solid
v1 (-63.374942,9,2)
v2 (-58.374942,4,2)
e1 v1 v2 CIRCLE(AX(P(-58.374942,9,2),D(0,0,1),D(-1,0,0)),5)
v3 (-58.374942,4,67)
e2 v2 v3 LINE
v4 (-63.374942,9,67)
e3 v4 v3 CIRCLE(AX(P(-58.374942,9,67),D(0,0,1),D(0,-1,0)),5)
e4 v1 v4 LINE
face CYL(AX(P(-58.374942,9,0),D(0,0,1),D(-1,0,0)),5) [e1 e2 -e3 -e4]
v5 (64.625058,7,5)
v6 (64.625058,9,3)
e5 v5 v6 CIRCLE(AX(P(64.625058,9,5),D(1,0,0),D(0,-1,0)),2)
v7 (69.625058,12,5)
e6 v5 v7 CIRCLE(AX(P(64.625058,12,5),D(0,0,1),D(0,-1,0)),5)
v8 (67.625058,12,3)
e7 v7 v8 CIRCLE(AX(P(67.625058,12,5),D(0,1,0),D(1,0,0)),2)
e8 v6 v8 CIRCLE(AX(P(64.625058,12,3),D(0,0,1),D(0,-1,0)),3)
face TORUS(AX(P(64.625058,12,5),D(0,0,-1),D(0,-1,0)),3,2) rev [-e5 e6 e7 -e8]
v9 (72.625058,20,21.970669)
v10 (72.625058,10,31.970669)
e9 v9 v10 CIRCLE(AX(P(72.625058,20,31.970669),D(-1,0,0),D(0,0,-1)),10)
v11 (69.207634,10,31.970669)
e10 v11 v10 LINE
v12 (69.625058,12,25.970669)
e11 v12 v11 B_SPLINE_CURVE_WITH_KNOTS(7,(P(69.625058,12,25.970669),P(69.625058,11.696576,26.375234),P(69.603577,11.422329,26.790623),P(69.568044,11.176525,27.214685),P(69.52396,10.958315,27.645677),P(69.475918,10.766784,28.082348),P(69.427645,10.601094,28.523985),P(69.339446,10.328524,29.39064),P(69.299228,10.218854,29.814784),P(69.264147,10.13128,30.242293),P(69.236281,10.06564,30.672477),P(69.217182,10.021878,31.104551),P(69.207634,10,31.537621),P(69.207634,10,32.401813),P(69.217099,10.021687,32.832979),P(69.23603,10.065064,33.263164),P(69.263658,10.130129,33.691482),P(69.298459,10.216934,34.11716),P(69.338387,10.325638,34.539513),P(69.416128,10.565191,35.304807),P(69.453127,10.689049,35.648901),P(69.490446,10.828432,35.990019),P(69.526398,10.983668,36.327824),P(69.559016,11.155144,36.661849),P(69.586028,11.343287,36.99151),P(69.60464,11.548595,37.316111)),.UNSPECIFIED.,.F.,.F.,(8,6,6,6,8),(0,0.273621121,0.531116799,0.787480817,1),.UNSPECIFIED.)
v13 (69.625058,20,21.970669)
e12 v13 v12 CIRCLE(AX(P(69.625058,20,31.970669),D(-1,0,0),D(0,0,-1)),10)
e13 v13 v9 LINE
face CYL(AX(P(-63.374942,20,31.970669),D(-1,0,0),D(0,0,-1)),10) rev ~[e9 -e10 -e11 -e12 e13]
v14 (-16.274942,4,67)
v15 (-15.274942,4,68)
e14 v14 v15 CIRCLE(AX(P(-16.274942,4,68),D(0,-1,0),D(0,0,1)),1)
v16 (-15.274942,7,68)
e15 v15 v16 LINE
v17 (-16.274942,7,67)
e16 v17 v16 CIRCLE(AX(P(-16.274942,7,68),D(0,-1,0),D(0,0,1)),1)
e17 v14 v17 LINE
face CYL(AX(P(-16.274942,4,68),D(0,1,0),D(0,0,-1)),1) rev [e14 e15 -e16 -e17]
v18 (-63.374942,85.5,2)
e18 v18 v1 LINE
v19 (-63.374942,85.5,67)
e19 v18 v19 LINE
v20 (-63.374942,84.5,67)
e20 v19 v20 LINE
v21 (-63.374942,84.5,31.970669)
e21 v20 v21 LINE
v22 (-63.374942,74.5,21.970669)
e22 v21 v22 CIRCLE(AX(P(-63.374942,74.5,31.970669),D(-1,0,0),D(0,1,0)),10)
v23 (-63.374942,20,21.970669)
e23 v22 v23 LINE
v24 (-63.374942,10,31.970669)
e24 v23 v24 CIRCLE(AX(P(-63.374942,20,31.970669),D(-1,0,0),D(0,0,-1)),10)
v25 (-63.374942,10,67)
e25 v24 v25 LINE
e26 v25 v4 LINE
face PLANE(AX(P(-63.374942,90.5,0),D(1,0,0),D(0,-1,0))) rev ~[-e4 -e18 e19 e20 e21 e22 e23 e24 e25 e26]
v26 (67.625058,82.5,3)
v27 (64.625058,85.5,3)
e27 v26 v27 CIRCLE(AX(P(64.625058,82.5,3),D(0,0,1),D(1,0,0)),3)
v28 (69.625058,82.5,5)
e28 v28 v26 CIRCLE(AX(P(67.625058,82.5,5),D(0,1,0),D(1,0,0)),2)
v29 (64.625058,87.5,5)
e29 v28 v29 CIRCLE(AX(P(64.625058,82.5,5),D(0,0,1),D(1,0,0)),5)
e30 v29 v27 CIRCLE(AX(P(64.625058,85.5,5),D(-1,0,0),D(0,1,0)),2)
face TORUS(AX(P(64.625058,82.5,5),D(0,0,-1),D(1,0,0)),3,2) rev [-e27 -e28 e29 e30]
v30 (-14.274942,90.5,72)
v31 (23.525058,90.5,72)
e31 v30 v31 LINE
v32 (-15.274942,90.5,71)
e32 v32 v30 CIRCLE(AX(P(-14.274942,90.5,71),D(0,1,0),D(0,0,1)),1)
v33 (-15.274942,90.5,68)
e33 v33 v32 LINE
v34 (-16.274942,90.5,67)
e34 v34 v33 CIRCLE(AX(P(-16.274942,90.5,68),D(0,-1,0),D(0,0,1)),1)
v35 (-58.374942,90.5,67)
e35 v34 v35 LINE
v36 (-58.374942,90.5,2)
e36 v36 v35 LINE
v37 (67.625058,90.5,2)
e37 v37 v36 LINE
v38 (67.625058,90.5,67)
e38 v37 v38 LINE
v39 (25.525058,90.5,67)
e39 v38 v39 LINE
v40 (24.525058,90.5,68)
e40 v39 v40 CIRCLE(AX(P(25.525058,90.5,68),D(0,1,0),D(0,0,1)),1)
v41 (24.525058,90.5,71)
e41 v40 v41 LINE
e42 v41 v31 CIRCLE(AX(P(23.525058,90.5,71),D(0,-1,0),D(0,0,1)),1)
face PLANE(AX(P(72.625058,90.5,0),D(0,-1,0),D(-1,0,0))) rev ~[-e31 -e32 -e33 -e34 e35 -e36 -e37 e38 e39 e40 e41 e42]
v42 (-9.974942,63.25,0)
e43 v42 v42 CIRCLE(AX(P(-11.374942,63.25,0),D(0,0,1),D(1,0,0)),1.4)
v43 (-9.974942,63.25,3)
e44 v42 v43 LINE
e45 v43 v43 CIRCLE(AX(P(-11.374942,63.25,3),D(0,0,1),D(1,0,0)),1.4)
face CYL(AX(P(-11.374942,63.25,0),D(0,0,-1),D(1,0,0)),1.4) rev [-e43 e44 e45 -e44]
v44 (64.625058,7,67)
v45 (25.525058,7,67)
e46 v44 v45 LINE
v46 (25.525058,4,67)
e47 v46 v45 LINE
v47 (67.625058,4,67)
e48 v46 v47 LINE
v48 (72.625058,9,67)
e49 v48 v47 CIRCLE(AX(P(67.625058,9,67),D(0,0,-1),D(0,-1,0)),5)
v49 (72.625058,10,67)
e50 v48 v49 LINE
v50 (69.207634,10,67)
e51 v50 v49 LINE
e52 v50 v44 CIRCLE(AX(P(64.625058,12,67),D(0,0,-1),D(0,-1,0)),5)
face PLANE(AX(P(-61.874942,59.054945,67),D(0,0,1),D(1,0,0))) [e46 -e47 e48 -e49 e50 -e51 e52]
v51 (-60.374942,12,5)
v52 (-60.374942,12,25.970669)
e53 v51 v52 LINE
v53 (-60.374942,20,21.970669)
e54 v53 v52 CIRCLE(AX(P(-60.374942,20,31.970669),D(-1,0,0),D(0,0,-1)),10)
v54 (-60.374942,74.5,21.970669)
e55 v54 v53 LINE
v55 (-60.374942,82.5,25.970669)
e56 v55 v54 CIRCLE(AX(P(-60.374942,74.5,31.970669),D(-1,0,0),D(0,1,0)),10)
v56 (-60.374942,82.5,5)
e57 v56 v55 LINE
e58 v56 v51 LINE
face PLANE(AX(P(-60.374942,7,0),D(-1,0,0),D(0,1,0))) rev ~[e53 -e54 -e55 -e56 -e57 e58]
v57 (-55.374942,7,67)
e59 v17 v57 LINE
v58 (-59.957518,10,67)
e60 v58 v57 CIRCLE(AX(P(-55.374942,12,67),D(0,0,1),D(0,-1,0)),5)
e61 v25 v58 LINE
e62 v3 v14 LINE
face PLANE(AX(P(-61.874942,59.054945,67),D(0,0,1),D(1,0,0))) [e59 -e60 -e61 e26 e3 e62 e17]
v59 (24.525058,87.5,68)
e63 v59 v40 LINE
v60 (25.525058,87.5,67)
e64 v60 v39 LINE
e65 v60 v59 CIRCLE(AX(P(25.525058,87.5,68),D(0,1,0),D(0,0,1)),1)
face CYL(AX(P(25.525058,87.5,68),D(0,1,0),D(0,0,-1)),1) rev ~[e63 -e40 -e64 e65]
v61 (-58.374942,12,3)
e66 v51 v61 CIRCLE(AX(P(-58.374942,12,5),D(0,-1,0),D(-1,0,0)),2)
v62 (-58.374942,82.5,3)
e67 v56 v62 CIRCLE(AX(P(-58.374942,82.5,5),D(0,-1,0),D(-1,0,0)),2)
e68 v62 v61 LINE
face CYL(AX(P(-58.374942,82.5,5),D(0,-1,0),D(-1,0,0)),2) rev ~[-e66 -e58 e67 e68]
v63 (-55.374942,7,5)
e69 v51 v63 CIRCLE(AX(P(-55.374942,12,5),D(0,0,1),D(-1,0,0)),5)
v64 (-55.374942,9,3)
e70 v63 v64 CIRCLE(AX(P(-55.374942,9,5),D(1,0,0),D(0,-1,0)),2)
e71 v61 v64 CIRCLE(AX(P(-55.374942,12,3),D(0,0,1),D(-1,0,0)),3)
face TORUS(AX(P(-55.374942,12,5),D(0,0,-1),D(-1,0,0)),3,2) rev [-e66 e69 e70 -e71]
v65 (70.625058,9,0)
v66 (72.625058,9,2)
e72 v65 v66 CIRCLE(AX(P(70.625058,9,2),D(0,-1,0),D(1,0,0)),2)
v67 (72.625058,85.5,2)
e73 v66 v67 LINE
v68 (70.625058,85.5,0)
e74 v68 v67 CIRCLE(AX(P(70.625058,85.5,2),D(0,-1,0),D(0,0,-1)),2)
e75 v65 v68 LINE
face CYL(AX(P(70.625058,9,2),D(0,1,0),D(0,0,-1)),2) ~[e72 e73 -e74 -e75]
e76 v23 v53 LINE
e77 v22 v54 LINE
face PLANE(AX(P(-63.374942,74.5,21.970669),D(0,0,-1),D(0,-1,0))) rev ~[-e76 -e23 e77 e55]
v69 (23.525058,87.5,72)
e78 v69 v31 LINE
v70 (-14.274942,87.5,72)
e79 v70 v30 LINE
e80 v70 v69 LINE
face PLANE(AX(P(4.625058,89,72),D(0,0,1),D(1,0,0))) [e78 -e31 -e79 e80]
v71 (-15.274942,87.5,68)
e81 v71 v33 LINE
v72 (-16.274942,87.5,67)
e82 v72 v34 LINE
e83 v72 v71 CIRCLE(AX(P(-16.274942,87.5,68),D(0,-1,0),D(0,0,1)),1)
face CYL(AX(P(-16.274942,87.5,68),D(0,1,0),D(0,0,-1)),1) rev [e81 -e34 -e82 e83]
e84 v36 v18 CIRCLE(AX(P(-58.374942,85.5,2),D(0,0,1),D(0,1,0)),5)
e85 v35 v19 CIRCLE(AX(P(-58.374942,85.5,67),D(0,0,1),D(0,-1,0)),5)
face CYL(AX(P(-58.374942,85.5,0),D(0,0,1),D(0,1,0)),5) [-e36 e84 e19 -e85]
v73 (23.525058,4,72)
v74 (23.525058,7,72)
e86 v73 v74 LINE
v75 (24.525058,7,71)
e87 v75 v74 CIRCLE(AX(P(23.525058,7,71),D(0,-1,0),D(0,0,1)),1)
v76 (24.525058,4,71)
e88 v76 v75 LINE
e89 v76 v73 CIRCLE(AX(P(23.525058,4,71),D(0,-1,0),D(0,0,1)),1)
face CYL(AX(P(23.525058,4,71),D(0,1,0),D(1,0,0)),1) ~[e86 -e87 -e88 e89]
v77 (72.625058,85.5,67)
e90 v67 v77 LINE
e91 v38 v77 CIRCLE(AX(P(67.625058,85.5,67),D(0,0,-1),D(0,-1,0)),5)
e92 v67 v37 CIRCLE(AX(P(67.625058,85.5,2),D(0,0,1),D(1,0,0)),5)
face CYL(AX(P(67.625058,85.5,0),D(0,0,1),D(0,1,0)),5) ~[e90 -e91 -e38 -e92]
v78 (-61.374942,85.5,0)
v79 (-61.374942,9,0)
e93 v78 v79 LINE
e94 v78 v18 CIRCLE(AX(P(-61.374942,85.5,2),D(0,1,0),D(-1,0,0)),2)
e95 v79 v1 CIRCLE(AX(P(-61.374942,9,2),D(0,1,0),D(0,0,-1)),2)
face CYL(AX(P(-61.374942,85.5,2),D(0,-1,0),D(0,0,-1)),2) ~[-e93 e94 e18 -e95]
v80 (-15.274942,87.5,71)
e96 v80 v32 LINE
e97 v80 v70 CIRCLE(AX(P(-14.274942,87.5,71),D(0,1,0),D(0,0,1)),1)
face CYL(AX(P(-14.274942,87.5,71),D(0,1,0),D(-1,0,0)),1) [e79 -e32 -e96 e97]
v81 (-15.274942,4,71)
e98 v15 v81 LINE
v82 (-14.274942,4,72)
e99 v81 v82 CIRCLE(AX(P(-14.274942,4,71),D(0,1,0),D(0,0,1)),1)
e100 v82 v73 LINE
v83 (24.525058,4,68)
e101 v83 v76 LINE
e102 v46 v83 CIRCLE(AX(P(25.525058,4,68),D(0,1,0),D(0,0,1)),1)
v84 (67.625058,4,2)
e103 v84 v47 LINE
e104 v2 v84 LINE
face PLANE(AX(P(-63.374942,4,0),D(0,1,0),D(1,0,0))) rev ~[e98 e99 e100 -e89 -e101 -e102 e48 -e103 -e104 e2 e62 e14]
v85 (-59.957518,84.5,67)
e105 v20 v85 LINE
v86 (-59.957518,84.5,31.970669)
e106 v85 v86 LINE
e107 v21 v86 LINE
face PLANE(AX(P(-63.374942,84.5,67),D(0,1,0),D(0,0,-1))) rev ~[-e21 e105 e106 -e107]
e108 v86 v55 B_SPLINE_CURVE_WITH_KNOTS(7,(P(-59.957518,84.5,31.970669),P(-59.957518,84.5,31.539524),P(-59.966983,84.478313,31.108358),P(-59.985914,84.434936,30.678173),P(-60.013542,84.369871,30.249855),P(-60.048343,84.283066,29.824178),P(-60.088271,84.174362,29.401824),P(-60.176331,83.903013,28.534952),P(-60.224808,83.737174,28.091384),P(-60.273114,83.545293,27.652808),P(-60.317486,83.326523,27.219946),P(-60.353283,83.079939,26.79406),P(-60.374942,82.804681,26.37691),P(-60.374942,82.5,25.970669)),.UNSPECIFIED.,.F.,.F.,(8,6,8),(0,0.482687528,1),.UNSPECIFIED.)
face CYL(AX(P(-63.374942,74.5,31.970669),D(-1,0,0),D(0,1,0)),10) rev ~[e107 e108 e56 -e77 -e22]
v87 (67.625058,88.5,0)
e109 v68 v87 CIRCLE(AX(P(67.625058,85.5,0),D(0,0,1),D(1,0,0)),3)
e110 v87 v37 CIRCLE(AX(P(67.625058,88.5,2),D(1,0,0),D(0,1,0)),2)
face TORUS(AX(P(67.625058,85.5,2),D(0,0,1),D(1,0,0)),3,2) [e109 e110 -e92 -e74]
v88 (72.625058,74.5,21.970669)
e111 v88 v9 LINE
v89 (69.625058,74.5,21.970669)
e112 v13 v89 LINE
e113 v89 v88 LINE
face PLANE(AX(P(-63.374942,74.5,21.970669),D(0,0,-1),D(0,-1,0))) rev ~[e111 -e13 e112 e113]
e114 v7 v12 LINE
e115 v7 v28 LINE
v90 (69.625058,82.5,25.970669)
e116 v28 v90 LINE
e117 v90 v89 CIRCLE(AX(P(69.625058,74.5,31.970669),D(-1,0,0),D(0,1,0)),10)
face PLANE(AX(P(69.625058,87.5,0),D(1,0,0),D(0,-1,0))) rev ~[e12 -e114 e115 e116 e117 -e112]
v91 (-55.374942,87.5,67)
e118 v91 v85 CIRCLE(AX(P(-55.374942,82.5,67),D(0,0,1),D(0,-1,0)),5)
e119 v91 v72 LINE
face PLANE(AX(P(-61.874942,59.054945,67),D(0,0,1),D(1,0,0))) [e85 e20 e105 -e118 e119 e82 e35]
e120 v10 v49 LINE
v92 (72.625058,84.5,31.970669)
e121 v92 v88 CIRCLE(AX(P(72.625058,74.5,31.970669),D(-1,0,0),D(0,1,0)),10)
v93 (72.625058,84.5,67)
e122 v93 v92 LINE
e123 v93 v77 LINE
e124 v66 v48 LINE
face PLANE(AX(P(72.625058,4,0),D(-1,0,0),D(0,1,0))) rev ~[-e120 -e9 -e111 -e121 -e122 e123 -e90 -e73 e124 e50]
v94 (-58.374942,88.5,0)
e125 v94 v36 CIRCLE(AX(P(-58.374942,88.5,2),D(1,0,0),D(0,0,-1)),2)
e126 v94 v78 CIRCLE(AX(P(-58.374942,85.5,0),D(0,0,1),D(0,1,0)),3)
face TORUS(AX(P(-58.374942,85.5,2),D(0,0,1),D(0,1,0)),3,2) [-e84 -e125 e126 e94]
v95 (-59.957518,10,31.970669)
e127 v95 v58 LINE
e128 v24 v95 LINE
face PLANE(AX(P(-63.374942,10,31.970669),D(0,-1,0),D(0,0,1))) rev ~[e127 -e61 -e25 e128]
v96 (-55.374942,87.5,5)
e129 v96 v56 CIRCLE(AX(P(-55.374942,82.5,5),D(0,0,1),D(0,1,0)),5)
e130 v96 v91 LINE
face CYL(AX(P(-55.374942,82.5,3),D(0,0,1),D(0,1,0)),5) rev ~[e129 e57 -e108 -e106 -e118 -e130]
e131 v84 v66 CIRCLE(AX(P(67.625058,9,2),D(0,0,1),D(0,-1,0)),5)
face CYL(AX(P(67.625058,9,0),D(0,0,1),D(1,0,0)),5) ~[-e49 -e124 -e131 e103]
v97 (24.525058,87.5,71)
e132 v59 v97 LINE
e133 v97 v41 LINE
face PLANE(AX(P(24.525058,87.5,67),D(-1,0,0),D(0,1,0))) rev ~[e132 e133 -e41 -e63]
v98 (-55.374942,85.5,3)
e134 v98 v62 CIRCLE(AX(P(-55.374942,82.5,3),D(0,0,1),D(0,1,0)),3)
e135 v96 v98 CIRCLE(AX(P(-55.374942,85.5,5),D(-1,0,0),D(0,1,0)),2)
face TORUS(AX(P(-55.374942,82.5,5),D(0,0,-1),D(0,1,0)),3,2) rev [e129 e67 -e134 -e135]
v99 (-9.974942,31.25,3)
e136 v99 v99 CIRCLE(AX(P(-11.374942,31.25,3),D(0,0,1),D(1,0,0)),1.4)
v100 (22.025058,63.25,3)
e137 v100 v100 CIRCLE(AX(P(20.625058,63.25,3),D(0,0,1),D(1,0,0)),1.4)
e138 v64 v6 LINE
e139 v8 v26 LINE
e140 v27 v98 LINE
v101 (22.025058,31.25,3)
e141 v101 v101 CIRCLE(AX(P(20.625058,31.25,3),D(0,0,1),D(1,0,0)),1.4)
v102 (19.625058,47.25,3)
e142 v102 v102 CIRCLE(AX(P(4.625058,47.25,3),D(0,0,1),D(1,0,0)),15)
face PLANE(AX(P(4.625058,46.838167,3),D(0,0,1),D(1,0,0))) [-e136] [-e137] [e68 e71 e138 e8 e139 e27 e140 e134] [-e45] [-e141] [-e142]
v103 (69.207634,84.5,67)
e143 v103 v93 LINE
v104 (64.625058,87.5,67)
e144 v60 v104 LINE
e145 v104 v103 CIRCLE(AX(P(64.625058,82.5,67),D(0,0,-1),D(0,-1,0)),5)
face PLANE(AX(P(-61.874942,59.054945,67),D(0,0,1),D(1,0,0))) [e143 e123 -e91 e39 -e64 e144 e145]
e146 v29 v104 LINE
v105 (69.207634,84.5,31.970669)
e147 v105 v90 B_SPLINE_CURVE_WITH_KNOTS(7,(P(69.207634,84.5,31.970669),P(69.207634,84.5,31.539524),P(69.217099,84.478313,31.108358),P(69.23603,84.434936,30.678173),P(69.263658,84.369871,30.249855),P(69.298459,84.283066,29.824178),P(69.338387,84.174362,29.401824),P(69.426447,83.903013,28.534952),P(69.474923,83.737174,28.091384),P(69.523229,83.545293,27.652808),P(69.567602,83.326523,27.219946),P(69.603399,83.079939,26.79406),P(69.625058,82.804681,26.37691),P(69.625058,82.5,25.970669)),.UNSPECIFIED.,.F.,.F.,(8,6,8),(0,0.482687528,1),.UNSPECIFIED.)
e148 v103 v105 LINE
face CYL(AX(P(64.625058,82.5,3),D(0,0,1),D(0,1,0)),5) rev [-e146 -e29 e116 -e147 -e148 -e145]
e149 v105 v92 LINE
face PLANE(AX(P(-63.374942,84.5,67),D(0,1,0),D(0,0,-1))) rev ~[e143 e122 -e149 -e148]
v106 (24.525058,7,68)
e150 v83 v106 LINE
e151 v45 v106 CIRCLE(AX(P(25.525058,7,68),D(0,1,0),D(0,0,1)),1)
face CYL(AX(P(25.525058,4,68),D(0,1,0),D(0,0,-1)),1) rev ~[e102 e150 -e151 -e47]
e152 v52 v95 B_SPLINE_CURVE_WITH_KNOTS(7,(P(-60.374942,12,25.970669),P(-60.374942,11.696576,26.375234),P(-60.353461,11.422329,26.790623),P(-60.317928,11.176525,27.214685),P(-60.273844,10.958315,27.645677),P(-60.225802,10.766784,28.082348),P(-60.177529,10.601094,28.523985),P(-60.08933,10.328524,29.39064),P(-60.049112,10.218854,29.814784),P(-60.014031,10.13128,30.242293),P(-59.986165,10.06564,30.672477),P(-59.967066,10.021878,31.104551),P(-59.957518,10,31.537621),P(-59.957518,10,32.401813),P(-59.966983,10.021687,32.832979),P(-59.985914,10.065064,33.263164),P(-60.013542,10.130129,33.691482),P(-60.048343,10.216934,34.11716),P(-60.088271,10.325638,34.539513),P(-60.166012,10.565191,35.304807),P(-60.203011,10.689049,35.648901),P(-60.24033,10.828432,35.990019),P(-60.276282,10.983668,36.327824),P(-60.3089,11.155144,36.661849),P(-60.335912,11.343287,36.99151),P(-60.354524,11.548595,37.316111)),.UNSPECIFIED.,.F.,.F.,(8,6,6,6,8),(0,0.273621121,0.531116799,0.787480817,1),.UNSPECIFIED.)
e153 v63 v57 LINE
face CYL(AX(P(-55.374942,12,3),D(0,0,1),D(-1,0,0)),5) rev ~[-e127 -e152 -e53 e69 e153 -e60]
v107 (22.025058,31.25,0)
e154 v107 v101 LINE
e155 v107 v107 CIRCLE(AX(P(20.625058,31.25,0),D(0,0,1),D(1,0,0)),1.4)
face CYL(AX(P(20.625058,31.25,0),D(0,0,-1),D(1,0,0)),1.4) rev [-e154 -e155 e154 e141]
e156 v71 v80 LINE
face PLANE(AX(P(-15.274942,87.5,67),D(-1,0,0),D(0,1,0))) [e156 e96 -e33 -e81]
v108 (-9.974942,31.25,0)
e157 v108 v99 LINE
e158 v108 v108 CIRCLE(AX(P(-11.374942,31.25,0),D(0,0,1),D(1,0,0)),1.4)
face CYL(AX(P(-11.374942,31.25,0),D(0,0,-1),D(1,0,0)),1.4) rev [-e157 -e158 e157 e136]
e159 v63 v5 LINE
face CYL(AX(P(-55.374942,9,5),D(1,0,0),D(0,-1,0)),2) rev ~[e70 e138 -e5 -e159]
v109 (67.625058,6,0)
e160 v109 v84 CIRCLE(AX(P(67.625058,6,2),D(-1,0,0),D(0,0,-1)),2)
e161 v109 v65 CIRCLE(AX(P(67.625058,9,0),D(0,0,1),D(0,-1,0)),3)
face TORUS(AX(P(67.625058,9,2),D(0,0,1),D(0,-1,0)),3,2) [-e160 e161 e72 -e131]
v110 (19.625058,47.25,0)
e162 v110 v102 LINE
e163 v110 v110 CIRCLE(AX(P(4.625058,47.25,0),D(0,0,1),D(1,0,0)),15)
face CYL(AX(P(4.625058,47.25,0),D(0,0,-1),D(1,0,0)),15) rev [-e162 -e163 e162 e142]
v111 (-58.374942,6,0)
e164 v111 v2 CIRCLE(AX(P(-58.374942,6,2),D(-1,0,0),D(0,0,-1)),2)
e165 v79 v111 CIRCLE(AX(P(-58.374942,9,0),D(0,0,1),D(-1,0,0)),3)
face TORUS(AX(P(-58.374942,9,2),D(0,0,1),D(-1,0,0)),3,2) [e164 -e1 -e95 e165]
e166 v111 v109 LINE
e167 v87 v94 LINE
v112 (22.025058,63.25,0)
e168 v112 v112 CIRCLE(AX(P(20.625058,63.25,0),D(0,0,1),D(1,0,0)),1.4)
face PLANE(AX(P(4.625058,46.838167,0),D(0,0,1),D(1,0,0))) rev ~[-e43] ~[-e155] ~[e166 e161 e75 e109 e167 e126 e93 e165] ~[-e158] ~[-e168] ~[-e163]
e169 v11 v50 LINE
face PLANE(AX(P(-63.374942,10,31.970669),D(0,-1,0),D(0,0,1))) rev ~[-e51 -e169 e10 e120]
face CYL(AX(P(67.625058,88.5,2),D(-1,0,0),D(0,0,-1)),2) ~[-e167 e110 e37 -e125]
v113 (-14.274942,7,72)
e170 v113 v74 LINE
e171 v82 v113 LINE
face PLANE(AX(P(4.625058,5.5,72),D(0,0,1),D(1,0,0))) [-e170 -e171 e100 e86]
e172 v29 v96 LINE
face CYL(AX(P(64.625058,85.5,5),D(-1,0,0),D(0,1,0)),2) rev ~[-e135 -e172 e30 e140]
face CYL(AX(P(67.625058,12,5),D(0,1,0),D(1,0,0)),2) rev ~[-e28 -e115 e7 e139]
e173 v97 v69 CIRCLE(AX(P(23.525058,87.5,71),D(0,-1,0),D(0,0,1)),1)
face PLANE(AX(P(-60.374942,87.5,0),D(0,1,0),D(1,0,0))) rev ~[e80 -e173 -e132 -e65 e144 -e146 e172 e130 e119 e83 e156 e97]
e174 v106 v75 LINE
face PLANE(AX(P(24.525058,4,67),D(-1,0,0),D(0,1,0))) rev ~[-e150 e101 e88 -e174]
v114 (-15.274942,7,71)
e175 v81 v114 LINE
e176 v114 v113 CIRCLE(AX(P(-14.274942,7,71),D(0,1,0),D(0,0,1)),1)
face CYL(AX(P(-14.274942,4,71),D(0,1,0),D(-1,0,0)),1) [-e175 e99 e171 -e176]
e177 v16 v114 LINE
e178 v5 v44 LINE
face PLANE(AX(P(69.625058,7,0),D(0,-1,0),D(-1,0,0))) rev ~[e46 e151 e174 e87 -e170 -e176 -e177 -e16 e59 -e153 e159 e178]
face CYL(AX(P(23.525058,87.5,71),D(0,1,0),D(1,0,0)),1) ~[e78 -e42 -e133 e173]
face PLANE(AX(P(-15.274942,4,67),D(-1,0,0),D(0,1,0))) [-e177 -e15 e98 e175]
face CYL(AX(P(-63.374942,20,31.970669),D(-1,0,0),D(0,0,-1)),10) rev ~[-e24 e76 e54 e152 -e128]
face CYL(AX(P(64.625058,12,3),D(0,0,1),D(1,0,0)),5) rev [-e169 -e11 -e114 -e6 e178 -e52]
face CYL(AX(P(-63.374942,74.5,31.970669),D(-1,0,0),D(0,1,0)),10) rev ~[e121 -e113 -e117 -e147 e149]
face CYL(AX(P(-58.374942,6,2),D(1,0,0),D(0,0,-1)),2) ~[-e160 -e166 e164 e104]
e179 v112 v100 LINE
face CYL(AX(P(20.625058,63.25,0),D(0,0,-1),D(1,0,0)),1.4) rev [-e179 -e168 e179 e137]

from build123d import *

# Parameters (mm, degrees)
F0_R     = 3
F0_R_2   = 1.4
F0_R_3   = 15
F0_R_4   = 1.5
F1_DEPTH = 3
F0_W     = 65
F0_H     = 3
F2_DEPTH = 67
F4_DEPTH = 136.001
F5_W     = 39.8
F5_H     = 3
F6_W     = 39.8
F6_H     = 3
F7_DEPTH = 5
F8_R     = 1
F9_R     = 5
F10_R    = 2


# Not quite as in the source:
# - a feature names something its author has since deleted; it is built from what else it names


with BuildPart() as f1:
    # F0 (on Top) → F1 (new body)
    with BuildSketch(Plane.XY):
        Polygon((-60.3749420391, 27.6098903269), (-60.3749420391, 7), (-15.3749420391, 7), (-15.3749420391, 12), (24.6250579609, 12), (24.6250579609, 7), (69.6250579609, 7), (69.6250579609, 53.4099719524), (69.6250579609, 87.5), (4.6250579609, 87.5), (-60.3749420391, 87.5), (-60.3749420391, 71.25), align=None)
        with Locations((-30.3749420391, 23.25)):
            Circle(F0_R, mode=Mode.SUBTRACT)
        with Locations((-11.3749420391, 31.25)):
            Circle(F0_R_2, mode=Mode.SUBTRACT)
        with Locations((20.6250579609, 31.25)):
            Circle(F0_R_2, mode=Mode.SUBTRACT)
        with Locations((52.6250579609, 23.25)):
            Circle(F0_R, mode=Mode.SUBTRACT)
        with Locations((-11.3749420391, 63.25)):
            Circle(F0_R_2, mode=Mode.SUBTRACT)
        with BuildLine():
            ThreePointArc((-27.3749420391, 71.25), (-30.3749420391, 68.25), (-33.3749420391, 71.25))
            ThreePointArc((-33.3749420391, 71.25), (-30.3749420391, 74.25), (-27.3749420391, 71.25))
        make_face(mode=Mode.SUBTRACT)
        with Locations((4.6250579609, 47.25)):
            Circle(F0_R_3, mode=Mode.SUBTRACT)
        with Locations((20.6250579609, 63.25)):
            Circle(F0_R_2, mode=Mode.SUBTRACT)
        with Locations((52.6250579609, 71.25)):
            Circle(F0_R, mode=Mode.SUBTRACT)
        Polygon((-15.3749420391, 12), (-15.3749420391, 7), (14.8769766092, 7), (24.6250579609, 7), (24.6250579609, 12), align=None)
        with BuildLine():
            ThreePointArc((-27.3749420391, 71.25), (-30.3749420391, 74.25), (-33.3749420391, 71.25))
            ThreePointArc((-33.3749420391, 71.25), (-30.3749420391, 68.25), (-27.3749420391, 71.25))
        make_face()
        with BuildLine():
            ThreePointArc((-28.8749420391, 71.25), (-30.3749420391, 69.75), (-31.8749420391, 71.25))
            ThreePointArc((-31.8749420391, 71.25), (-30.3749420391, 72.75), (-28.8749420391, 71.25))
        make_face(mode=Mode.SUBTRACT)
        with BuildLine():
            ThreePointArc((-28.8749420391, 71.25), (-30.3749420391, 72.75), (-31.8749420391, 71.25))
            ThreePointArc((-31.8749420391, 71.25), (-30.3749420391, 69.75), (-28.8749420391, 71.25))
        make_face()
        with Locations((52.6250579609, 71.25)):
            Circle(F0_R)
        with Locations((52.6250579609, 71.25)):
            Circle(F0_R_4, mode=Mode.SUBTRACT)
        with Locations((52.6250579609, 71.25)):
            Circle(F0_R_4)
        with Locations((52.6250579609, 23.25)):
            Circle(F0_R)
        with Locations((52.6250579609, 23.25)):
            Circle(F0_R_4, mode=Mode.SUBTRACT)
        with Locations((52.6250579609, 23.25)):
            Circle(F0_R_4)
        with Locations((-30.3749420391, 23.25)):
            Circle(F0_R)
        with Locations((-30.3749420391, 23.25)):
            Circle(F0_R_4, mode=Mode.SUBTRACT)
        with Locations((-30.3749420391, 23.25)):
            Circle(F0_R_4)
    extrude(amount=F1_DEPTH)

    # F0 (on Top) → F2 (join)
    with BuildSketch(Plane.XY):
        Polygon((-63.3749420391, 27.6098903269), (-60.3749420391, 27.6098903269), (-60.3749420391, 71.25), (-60.3749420391, 87.5), (-60.3749420391, 90.5), (-63.3749420391, 90.5), align=None)
        with Locations((-27.8749420391, 89)):
            Rectangle(F0_W, F0_H)
        with Locations((37.1250579609, 89)):
            Rectangle(F0_W, F0_H)
        Polygon((69.6250579609, 87.5), (69.6250579609, 53.4099719524), (72.6250579609, 53.4099719524), (72.6250579609, 90.5), (69.6250579609, 90.5), align=None)
        Polygon((69.6250579609, 7), (69.6250579609, 4), (72.6250579609, 4), (72.6250579609, 53.4099719524), (69.6250579609, 53.4099719524), align=None)
        Polygon((14.8769766092, 4), (69.6250579609, 4), (69.6250579609, 7), (24.6250579609, 7), (14.8769766092, 7), align=None)
        Polygon((-60.3749420391, 7), (-60.3749420391, 4), (14.8769766092, 4), (14.8769766092, 7), (-15.3749420391, 7), align=None)
        Polygon((-63.3749420391, 4), (-60.3749420391, 4), (-60.3749420391, 7), (-60.3749420391, 27.6098903269), (-63.3749420391, 27.6098903269), align=None)
    extrude(amount=F2_DEPTH)

    # F3 (on face) → F4 (cut, through all)
    with BuildSketch(Plane(origin=(-63.3749420391, 0, 0), x_dir=(0, -1, 0), z_dir=(-1, 0, 0))):
        with BuildLine():
            ThreePointArc((-20, 21.9706685841), (-12.9289321881, 24.8996007722), (-10, 31.9706685841))
            ThreePointArc((-10, 31.9706685841), (-20, 41.9706685841), (-30, 31.9706685841))
            ThreePointArc((-30, 31.9706685841), (-27.0710678119, 24.8996007722), (-20, 21.9706685841))
        make_face()
        with BuildLine():
            ThreePointArc((-30, 31.9706685841), (-20, 41.9706685841), (-10, 31.9706685841))
            Line((-10, 31.9706685841), (-10, 67))
            Line((-10, 67), (-30, 67))
            Line((-30, 67), (-30, 31.9706685841))
        make_face()
        with BuildLine():
            ThreePointArc((-74.5, 21.9706685841), (-67.4289321881, 24.8996007722), (-64.5, 31.9706685841))
            ThreePointArc((-64.5, 31.9706685841), (-74.5, 41.9706685841), (-84.5, 31.9706685841))
            ThreePointArc((-84.5, 31.9706685841), (-81.5710678119, 24.8996007722), (-74.5, 21.9706685841))
        make_face()
        with BuildLine():
            Line((-64.5, 31.9706685841), (-30, 31.9706685841))
            Line((-30, 31.9706685841), (-30, 67))
            Line((-30, 67), (-84.5, 67))
            Line((-84.5, 67), (-84.5, 31.9706685841))
            ThreePointArc((-84.5, 31.9706685841), (-74.5, 41.9706685841), (-64.5, 31.9706685841))
        make_face()
        with BuildLine():
            ThreePointArc((-20, 21.9706685841), (-27.0710678119, 24.8996007722), (-30, 31.9706685841))
            Line((-30, 31.9706685841), (-64.5, 31.9706685841))
            ThreePointArc((-64.5, 31.9706685841), (-67.4289321881, 24.8996007722), (-74.5, 21.9706685841))
            Line((-74.5, 21.9706685841), (-20, 21.9706685841))
        make_face()
    extrude(amount=-F4_DEPTH, mode=Mode.SUBTRACT)

    # F5 (on face) + F6 (on face) → F7 (join)
    with BuildSketch(Plane.XY.offset(67)):
        with Locations((4.6250579609, 5.5)):
            Rectangle(F5_W, F5_H)
    with BuildSketch(Plane.XY.offset(67)):
        with Locations((4.6250579609, 89)):
            Rectangle(F6_W, F6_H)
    extrude(amount=F7_DEPTH)

    # F8
    f8_edges = [f1.edges().sort_by_distance(p)[0] for p in [
        (-15.274942, 5.5, 67),
        (-15.274942, 5.5, 72),
        (24.525058, 5.5, 72),
        (24.525058, 5.5, 67),
        (-15.274942, 89, 67),
        (-15.274942, 89, 72),
        (24.525058, 89, 72),
        (24.525058, 89, 67),
    ]]
    fillet(f8_edges, radius=F8_R)

    # F9
    f9_edges = [f1.edges().sort_by_distance(p)[0] for p in [
        (72.625058, 4, 33.5),
        (72.625058, 90.5, 33.5),
        (-63.374942, 90.5, 33.5),
        (-63.374942, 4, 33.5),
        (-60.374942, 7, 35),
        (-60.374942, 87.5, 35),
        (69.625058, 87.5, 35),
        (69.625058, 7, 35),
    ]]
    fillet(f9_edges, radius=F9_R)

    # F10
    f10_edges = [f1.edges().sort_by_distance(p)[0] for p in [
        (4.625058, 87.5, 3),
        (4.625058, 4, 0),
    ]]
    fillet(f10_edges, radius=F10_R)


solid = f1.part
